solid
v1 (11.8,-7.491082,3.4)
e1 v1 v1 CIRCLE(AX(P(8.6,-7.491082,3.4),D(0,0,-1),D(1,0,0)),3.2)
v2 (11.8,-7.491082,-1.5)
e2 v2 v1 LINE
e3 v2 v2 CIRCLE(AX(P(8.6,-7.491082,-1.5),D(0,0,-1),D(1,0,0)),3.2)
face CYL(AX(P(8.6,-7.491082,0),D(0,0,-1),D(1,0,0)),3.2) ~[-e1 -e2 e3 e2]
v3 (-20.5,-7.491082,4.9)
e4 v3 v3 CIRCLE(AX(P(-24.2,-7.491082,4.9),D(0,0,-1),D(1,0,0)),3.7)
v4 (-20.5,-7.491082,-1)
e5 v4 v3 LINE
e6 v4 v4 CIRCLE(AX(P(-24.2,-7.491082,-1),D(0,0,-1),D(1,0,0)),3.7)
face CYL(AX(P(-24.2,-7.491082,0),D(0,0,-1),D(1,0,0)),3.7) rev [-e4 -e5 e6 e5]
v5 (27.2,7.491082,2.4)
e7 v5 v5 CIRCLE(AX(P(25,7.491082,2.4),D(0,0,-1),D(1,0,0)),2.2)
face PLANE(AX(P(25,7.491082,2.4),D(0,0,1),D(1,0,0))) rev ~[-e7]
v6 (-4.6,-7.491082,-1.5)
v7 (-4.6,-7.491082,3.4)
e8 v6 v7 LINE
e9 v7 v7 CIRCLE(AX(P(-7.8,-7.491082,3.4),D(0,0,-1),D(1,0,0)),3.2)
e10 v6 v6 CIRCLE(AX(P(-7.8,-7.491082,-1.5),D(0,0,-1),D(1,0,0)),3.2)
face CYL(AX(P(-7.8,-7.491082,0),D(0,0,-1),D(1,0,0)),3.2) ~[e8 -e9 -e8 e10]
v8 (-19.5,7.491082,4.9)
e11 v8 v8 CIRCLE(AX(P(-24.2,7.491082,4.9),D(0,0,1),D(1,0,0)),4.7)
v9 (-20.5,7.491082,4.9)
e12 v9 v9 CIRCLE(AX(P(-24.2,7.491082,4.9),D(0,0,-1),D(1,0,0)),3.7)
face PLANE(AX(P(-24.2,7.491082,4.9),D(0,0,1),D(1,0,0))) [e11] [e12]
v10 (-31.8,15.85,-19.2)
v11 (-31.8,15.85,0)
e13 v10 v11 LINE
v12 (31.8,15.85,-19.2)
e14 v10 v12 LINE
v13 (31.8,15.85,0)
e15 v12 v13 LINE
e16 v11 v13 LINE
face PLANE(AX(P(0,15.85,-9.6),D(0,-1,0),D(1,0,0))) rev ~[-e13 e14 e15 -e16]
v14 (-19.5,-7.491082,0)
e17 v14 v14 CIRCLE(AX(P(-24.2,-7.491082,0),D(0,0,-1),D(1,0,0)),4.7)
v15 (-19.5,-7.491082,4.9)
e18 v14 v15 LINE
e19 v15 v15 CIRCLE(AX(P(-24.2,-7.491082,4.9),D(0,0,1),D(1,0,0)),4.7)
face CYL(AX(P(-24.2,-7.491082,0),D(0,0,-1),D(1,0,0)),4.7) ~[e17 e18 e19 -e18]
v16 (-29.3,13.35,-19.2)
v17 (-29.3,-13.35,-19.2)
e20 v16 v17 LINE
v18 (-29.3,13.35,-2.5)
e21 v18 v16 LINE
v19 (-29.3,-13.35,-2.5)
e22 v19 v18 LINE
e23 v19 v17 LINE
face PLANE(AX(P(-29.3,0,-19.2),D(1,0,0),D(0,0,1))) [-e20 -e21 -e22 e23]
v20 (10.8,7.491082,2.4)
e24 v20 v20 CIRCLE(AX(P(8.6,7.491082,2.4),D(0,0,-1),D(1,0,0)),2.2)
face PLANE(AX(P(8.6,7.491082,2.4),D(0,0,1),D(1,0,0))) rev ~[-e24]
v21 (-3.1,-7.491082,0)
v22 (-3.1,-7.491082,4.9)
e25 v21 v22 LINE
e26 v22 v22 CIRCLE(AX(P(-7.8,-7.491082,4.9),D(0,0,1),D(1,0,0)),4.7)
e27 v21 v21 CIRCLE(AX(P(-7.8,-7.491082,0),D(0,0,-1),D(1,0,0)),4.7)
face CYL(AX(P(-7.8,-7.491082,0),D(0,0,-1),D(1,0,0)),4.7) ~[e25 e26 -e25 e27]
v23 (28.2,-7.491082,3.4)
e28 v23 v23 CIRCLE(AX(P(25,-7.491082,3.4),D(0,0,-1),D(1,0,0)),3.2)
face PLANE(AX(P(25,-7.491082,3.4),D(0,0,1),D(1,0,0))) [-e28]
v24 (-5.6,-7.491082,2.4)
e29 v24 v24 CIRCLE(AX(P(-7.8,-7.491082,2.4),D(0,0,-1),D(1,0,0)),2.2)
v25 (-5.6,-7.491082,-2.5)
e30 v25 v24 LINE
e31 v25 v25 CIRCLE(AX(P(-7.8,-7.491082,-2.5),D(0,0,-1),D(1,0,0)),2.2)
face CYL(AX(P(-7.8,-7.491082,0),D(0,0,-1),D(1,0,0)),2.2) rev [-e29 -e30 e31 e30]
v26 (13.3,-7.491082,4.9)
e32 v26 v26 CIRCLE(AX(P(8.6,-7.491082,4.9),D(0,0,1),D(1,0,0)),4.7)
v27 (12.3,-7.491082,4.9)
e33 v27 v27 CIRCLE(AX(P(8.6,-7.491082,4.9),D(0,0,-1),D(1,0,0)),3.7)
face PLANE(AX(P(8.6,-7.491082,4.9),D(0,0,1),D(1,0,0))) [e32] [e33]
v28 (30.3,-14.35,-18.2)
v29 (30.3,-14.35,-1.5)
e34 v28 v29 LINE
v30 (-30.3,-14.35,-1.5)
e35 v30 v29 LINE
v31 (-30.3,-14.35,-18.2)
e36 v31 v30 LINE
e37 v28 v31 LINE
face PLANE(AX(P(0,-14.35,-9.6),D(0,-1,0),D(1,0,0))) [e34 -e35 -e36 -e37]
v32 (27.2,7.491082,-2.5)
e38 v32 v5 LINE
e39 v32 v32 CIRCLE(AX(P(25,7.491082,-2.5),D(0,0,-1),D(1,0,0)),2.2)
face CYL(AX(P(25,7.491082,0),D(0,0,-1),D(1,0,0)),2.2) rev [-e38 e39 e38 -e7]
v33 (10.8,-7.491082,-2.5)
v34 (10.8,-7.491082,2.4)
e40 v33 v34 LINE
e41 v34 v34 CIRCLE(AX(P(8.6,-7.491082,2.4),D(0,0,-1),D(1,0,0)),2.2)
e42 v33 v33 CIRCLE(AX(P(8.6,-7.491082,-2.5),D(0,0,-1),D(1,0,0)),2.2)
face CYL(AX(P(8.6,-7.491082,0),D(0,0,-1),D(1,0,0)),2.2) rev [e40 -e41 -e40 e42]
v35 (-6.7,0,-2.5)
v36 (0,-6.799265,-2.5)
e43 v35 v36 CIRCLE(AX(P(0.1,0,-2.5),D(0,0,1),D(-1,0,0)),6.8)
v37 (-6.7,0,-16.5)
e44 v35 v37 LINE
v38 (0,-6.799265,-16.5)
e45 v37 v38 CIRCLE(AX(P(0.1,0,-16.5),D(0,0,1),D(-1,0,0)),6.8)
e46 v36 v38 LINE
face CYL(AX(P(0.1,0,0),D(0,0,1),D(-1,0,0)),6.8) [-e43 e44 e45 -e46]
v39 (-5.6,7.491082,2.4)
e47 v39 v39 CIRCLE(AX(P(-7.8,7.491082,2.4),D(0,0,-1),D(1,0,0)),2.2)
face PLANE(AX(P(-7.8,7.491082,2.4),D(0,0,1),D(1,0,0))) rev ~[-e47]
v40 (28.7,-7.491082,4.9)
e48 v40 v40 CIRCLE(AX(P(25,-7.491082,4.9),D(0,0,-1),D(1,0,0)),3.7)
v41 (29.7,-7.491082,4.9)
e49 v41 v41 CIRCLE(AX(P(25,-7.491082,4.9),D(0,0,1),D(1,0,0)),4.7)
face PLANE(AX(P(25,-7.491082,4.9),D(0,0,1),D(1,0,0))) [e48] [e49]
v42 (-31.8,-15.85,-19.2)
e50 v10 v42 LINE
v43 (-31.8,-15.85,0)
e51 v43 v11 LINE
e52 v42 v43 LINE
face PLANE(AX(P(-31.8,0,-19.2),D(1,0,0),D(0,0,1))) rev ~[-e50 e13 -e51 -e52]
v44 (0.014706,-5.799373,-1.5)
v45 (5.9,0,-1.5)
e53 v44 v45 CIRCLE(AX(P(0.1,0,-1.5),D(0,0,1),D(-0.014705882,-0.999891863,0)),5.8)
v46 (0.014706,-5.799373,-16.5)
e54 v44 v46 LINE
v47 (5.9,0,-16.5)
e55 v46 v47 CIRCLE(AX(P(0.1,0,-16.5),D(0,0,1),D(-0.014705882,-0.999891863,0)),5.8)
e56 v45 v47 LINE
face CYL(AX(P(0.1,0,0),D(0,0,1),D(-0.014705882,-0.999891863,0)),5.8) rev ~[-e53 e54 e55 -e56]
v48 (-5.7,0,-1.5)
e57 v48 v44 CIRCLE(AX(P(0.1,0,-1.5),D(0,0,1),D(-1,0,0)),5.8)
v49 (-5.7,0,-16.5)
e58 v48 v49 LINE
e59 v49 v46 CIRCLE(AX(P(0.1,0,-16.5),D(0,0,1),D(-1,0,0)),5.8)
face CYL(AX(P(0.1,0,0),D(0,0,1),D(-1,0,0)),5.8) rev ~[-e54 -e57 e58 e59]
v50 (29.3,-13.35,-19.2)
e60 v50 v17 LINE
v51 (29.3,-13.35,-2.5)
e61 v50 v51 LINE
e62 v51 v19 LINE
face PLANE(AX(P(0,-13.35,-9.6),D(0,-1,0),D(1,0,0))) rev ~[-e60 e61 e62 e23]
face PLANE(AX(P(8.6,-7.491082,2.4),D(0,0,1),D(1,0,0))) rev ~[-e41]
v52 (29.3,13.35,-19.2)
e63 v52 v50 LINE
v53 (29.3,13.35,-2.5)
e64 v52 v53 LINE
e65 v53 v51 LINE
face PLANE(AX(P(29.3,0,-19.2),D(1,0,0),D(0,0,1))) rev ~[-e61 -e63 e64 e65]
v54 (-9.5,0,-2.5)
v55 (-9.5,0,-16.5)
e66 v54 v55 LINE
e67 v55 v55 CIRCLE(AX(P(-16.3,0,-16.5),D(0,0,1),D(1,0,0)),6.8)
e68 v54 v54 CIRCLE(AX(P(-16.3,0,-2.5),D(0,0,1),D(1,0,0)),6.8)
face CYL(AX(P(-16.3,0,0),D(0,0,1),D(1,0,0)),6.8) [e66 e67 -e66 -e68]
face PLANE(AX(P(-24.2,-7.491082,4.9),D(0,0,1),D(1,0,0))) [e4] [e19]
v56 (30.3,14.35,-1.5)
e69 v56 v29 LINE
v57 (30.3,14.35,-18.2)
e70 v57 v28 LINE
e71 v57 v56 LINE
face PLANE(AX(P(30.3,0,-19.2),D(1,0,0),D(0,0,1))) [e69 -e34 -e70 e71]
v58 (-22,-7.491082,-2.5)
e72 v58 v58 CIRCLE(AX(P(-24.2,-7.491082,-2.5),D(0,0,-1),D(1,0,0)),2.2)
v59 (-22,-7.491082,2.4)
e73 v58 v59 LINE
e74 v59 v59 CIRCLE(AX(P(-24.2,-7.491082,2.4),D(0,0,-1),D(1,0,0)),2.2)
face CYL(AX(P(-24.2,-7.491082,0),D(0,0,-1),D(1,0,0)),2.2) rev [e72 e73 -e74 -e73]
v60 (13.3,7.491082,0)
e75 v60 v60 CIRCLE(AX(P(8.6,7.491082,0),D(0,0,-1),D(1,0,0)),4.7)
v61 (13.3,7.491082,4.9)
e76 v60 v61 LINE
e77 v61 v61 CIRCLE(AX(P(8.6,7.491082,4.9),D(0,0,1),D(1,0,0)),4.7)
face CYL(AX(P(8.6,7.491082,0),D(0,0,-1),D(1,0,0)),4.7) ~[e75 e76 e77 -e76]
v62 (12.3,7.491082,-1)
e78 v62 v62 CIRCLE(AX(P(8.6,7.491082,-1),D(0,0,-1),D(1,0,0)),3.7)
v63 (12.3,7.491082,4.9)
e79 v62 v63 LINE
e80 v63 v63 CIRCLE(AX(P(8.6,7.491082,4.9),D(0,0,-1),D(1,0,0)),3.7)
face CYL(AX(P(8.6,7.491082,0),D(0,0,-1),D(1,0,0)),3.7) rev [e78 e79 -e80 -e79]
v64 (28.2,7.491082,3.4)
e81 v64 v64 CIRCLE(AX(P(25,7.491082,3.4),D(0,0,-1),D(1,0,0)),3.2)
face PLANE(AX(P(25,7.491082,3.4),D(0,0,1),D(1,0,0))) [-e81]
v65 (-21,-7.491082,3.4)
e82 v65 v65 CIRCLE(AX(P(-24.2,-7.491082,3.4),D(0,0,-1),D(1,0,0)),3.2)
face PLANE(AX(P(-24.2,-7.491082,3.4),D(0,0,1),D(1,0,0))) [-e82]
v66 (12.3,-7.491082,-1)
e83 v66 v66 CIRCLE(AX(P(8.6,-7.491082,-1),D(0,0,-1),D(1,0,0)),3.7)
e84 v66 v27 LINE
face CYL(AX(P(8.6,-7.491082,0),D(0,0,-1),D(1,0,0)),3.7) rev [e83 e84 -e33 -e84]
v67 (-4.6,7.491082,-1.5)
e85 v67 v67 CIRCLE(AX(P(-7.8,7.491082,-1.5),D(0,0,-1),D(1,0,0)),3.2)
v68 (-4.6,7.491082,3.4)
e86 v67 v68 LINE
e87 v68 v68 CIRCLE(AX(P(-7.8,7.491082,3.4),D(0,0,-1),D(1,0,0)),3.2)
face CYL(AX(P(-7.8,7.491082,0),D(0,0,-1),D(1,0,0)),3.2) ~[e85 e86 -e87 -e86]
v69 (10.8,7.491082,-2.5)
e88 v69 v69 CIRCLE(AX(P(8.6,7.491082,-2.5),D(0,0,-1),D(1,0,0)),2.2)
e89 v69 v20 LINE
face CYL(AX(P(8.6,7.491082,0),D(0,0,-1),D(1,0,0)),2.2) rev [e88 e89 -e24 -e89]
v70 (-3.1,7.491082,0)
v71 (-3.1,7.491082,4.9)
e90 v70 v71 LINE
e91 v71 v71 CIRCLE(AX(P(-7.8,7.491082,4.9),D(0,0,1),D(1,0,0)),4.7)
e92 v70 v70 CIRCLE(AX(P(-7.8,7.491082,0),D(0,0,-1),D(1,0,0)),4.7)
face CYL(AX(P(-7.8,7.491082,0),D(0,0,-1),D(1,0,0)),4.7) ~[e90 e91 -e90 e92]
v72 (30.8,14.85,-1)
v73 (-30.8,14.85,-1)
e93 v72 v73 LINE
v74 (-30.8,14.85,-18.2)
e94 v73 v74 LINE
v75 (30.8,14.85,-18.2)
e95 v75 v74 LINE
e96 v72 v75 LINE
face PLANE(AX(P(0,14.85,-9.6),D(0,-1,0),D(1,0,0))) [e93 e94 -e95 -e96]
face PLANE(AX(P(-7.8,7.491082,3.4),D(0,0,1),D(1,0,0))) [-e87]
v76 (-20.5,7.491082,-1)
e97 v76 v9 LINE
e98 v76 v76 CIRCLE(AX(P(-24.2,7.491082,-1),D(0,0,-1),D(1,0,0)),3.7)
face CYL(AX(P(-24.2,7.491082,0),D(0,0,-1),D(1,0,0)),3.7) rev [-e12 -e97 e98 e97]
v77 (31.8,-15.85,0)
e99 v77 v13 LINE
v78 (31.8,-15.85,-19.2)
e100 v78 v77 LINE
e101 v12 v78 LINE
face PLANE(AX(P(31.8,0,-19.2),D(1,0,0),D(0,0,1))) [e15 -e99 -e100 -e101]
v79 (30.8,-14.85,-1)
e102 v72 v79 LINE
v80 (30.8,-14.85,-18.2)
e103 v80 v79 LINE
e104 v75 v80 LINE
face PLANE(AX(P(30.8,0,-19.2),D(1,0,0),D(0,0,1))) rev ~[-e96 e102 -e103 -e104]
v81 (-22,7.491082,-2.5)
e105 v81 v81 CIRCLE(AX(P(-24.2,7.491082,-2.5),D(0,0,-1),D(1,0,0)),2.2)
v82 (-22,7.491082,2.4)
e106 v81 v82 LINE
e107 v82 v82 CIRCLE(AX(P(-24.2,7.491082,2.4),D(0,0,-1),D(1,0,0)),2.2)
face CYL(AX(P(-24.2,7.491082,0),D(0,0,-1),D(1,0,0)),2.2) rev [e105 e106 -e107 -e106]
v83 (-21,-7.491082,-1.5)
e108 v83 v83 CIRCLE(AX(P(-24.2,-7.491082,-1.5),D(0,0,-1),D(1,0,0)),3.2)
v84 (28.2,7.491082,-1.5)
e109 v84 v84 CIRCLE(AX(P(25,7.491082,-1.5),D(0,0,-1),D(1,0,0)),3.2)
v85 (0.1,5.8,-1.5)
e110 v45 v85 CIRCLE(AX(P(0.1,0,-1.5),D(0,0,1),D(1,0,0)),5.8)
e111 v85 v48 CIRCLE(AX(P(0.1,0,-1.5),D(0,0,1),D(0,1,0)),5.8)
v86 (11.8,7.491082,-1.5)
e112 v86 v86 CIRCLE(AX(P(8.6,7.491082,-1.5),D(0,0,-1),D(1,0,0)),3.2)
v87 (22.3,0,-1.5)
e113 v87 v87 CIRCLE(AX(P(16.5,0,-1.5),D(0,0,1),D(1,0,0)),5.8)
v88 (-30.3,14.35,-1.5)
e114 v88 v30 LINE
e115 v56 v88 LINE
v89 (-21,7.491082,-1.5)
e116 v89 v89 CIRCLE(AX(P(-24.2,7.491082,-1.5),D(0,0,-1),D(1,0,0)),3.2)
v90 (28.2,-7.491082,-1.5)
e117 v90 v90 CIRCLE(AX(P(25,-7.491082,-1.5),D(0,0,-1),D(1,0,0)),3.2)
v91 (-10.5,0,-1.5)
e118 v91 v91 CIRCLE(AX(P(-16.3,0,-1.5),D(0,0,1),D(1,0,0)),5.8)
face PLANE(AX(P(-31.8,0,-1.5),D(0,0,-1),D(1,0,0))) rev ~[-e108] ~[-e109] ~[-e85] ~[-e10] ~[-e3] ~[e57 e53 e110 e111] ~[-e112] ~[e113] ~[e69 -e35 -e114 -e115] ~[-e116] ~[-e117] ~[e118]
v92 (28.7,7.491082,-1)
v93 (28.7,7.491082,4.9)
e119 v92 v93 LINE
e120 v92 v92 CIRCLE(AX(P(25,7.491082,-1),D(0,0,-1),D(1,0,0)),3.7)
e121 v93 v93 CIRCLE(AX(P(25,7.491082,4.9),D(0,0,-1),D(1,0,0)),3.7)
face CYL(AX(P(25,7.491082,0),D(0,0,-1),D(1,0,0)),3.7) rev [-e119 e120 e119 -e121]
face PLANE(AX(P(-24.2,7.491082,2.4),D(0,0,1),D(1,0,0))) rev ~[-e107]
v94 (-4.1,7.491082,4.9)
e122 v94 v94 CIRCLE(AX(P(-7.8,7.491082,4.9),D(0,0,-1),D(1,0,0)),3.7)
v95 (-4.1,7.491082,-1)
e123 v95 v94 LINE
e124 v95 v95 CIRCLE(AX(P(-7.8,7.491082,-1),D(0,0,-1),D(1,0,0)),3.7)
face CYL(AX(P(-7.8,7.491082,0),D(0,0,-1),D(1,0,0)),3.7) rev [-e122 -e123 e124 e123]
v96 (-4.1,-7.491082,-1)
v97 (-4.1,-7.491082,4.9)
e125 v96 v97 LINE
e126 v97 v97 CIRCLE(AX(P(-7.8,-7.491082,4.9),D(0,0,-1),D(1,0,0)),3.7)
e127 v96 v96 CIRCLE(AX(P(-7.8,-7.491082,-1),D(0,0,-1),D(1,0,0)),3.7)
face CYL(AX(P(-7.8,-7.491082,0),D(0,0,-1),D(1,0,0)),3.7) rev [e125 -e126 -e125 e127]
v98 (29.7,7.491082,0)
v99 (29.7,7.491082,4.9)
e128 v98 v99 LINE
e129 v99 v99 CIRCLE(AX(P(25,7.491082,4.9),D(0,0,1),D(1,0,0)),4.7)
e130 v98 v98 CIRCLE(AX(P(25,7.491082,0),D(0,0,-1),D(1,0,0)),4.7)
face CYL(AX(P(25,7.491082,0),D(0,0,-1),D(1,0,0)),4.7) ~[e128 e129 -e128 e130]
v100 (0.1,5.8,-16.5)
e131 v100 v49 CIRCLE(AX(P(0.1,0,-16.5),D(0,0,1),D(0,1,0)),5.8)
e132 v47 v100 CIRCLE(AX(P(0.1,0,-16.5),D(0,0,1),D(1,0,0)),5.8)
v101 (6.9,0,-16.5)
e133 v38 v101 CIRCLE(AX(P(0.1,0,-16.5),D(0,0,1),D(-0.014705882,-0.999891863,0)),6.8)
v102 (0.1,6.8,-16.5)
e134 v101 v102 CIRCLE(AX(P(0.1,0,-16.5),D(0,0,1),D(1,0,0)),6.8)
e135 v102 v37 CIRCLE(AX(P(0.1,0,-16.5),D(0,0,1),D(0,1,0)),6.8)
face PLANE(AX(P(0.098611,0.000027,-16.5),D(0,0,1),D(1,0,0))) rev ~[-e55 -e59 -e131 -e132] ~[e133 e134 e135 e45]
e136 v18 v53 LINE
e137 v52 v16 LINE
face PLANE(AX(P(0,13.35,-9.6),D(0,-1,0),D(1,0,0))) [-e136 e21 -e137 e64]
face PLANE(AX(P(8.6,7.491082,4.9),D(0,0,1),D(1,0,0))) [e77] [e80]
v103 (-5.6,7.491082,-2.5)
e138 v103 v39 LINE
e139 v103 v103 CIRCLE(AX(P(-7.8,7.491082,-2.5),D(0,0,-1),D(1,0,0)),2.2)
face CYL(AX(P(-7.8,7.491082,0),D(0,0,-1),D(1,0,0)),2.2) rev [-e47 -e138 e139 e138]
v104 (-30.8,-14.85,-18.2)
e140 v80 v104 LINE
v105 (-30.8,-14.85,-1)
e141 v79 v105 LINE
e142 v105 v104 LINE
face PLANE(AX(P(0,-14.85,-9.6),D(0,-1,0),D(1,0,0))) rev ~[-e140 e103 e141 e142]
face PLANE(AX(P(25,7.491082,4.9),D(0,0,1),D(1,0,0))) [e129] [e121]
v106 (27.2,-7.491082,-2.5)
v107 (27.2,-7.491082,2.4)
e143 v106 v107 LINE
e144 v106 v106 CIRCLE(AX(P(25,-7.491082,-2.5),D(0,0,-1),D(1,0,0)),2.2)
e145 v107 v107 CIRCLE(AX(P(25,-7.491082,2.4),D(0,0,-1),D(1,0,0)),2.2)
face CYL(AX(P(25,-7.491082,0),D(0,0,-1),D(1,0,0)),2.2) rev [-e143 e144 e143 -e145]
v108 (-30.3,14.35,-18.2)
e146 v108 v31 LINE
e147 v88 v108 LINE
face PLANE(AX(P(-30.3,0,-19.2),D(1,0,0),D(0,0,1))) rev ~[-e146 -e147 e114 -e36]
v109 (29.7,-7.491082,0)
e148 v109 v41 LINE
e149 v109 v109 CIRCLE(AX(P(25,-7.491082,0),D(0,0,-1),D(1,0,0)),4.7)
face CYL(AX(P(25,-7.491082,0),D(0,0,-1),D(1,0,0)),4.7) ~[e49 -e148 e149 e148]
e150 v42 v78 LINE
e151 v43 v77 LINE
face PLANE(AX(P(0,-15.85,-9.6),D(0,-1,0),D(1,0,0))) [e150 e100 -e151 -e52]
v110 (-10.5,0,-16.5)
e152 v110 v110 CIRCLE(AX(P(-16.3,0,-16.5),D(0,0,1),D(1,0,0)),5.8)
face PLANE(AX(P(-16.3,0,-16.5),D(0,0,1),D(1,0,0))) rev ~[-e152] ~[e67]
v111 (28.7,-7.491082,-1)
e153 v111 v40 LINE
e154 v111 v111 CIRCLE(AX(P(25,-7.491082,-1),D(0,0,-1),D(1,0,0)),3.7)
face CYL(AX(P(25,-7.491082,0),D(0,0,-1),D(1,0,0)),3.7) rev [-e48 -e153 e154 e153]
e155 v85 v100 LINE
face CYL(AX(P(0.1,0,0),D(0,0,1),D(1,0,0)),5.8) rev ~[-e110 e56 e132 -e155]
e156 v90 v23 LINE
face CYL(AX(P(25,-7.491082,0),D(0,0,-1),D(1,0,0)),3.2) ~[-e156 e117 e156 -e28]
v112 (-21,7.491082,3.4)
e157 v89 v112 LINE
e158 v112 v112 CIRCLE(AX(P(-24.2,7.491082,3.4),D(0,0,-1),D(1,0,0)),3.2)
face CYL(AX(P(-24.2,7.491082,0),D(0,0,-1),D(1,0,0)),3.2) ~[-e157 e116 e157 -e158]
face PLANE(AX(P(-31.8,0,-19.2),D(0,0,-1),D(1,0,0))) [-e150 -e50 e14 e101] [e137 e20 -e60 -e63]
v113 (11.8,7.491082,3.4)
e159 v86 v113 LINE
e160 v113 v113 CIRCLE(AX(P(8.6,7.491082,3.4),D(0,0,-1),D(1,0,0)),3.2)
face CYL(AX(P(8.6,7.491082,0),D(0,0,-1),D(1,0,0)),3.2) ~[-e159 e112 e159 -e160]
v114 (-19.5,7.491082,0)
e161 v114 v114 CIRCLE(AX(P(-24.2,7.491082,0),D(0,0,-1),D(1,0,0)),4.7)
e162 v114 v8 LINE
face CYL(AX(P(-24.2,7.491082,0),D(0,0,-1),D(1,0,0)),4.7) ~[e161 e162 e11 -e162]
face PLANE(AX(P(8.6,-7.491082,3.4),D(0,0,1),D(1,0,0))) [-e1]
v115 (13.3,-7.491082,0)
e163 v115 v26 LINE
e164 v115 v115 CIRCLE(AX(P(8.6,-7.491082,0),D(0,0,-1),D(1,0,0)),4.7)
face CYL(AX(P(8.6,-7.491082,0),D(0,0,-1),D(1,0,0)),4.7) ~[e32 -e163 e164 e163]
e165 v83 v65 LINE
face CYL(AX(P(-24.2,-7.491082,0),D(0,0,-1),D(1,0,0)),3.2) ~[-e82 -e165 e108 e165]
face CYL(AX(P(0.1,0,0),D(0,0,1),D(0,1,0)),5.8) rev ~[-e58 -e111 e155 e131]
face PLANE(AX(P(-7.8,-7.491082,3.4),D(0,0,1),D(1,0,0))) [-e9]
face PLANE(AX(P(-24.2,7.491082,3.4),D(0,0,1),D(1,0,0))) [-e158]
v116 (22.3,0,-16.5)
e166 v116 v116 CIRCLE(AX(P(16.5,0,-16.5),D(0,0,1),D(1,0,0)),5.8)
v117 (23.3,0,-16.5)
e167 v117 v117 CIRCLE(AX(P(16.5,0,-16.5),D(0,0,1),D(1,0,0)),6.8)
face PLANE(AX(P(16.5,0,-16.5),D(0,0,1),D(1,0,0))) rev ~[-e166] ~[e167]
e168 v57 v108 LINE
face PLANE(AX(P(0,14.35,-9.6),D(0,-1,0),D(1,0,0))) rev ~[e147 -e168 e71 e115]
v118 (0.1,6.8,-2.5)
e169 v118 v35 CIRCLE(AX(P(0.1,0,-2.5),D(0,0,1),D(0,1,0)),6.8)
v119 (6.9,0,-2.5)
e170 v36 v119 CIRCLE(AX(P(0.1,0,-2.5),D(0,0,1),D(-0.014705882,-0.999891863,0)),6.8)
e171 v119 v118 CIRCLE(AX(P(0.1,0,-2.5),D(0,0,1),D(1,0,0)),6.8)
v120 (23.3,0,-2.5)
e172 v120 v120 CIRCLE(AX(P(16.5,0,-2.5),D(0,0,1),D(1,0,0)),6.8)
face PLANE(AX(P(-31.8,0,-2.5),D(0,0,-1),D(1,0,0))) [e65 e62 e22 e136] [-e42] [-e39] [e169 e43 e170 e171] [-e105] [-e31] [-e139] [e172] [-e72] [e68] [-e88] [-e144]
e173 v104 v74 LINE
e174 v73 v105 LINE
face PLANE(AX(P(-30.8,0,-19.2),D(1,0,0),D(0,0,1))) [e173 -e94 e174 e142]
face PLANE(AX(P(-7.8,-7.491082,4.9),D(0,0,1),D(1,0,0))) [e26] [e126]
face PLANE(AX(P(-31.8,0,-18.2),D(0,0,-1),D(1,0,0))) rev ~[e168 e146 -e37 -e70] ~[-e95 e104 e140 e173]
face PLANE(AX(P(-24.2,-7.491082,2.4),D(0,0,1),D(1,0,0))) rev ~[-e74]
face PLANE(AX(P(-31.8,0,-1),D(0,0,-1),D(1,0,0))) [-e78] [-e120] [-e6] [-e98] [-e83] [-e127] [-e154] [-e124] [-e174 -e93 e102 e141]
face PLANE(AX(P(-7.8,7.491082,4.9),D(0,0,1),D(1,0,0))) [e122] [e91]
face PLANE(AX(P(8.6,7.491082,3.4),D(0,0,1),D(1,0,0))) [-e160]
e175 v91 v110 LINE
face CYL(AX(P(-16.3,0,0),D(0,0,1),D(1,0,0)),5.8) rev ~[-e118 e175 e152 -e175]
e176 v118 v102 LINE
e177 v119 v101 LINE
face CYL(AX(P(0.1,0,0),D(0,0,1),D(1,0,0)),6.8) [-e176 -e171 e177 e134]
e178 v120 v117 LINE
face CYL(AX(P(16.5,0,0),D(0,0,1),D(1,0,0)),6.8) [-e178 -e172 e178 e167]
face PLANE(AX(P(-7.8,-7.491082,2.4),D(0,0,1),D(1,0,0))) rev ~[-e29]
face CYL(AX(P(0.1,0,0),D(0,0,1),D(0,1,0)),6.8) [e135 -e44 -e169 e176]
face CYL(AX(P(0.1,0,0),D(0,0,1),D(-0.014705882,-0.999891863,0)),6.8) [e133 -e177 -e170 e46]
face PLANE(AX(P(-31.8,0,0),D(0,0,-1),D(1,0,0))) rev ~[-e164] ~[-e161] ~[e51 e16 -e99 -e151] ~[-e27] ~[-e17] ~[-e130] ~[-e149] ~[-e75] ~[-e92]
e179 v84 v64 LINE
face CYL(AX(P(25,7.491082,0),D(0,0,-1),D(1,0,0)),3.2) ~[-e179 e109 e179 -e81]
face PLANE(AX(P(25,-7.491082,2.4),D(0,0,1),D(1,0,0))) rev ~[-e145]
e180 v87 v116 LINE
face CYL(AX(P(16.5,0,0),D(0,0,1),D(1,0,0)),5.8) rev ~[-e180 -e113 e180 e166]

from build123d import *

# Parameters (mm, degrees)
F0_W     = 63.6
F0_H     = 19.2
F1_DEPTH = 15.85
F2_R     = 4.7
F3_DEPTH = 4.9
F4_T     = -2.5
F5_R     = 6.8
F6_DEPTH = 16.5
F7_T     = -1


with BuildPart() as f1:
    # F0 (on Front) → F1 (new body, symmetric)
    with BuildSketch(Plane.XZ):
        with Locations((0, -9.6)):
            Rectangle(F0_W, F0_H)
    extrude(amount=F1_DEPTH, both=True)

    # F2 (on Top) → F3 (join)
    with BuildSketch(Plane.XY):
        with Locations((-24.2, 7.491081953)):
            Circle(F2_R)
        with Locations((-7.8, 7.491081953)):
            Circle(F2_R)
        with Locations((8.6, 7.491081953)):
            Circle(F2_R)
        with Locations((25, 7.491081953)):
            Circle(F2_R)
        with Locations((25, -7.491081953)):
            Circle(F2_R)
        with Locations((8.6, -7.491081953)):
            Circle(F2_R)
        with Locations((-7.8, -7.491081953)):
            Circle(F2_R)
        with Locations((-24.2, -7.491081953)):
            Circle(F2_R)
    extrude(amount=F3_DEPTH)

    # F4
    f4_openings = [f1.faces().sort_by_distance(p)[0] for p in [
        (0, 0, -19.2),
    ]]
    offset(amount=F4_T, openings=f4_openings, kind=Kind.INTERSECTION)

    # F5 (on Top) → F6 (join)
    with BuildSketch(Plane.XY):
        with BuildLine():
            ThreePointArc((9.7, 0), (16.5, -6.8), (23.3, 0))
            ThreePointArc((23.3, 0), (16.5, 6.8), (9.7, 0))
        make_face()
        with Locations((-16.3, 0)):
            Circle(F5_R)
        with BuildLine():
            ThreePointArc((0, -6.7992646661), (4.8728398255, -4.8435524153), (6.9, 0))
            ThreePointArc((6.9, 0), (4.9083261121, 4.8083261121), (0.1, 6.8))
            ThreePointArc((0.1, 6.8), (-4.7083261121, 4.8083261121), (-6.7, 0))
            ThreePointArc((-6.7, 0), (-4.7435524153, -4.7728398255), (0, -6.7992646661))
        make_face()
    extrude(amount=-F6_DEPTH)

    # F7
    f7_openings = [f1.faces().sort_by_distance(p)[0] for p in [
        (16.5, 0, -16.5),
        (0.1, 0, -16.5),
        (-16.3, 0, -16.5),
        (-24.2, -7.491082, 4.9),
        (-24.2, 7.491082, 4.9),
        (-7.8, 7.491082, 4.9),
        (-7.8, -7.491082, 4.9),
        (8.6, -7.491082, 4.9),
        (8.6, 7.491082, 4.9),
        (25, 7.491082, 4.9),
        (25, -7.491082, 4.9),
    ]]
    offset(amount=F7_T, openings=f7_openings, kind=Kind.INTERSECTION)


solid = f1.part
